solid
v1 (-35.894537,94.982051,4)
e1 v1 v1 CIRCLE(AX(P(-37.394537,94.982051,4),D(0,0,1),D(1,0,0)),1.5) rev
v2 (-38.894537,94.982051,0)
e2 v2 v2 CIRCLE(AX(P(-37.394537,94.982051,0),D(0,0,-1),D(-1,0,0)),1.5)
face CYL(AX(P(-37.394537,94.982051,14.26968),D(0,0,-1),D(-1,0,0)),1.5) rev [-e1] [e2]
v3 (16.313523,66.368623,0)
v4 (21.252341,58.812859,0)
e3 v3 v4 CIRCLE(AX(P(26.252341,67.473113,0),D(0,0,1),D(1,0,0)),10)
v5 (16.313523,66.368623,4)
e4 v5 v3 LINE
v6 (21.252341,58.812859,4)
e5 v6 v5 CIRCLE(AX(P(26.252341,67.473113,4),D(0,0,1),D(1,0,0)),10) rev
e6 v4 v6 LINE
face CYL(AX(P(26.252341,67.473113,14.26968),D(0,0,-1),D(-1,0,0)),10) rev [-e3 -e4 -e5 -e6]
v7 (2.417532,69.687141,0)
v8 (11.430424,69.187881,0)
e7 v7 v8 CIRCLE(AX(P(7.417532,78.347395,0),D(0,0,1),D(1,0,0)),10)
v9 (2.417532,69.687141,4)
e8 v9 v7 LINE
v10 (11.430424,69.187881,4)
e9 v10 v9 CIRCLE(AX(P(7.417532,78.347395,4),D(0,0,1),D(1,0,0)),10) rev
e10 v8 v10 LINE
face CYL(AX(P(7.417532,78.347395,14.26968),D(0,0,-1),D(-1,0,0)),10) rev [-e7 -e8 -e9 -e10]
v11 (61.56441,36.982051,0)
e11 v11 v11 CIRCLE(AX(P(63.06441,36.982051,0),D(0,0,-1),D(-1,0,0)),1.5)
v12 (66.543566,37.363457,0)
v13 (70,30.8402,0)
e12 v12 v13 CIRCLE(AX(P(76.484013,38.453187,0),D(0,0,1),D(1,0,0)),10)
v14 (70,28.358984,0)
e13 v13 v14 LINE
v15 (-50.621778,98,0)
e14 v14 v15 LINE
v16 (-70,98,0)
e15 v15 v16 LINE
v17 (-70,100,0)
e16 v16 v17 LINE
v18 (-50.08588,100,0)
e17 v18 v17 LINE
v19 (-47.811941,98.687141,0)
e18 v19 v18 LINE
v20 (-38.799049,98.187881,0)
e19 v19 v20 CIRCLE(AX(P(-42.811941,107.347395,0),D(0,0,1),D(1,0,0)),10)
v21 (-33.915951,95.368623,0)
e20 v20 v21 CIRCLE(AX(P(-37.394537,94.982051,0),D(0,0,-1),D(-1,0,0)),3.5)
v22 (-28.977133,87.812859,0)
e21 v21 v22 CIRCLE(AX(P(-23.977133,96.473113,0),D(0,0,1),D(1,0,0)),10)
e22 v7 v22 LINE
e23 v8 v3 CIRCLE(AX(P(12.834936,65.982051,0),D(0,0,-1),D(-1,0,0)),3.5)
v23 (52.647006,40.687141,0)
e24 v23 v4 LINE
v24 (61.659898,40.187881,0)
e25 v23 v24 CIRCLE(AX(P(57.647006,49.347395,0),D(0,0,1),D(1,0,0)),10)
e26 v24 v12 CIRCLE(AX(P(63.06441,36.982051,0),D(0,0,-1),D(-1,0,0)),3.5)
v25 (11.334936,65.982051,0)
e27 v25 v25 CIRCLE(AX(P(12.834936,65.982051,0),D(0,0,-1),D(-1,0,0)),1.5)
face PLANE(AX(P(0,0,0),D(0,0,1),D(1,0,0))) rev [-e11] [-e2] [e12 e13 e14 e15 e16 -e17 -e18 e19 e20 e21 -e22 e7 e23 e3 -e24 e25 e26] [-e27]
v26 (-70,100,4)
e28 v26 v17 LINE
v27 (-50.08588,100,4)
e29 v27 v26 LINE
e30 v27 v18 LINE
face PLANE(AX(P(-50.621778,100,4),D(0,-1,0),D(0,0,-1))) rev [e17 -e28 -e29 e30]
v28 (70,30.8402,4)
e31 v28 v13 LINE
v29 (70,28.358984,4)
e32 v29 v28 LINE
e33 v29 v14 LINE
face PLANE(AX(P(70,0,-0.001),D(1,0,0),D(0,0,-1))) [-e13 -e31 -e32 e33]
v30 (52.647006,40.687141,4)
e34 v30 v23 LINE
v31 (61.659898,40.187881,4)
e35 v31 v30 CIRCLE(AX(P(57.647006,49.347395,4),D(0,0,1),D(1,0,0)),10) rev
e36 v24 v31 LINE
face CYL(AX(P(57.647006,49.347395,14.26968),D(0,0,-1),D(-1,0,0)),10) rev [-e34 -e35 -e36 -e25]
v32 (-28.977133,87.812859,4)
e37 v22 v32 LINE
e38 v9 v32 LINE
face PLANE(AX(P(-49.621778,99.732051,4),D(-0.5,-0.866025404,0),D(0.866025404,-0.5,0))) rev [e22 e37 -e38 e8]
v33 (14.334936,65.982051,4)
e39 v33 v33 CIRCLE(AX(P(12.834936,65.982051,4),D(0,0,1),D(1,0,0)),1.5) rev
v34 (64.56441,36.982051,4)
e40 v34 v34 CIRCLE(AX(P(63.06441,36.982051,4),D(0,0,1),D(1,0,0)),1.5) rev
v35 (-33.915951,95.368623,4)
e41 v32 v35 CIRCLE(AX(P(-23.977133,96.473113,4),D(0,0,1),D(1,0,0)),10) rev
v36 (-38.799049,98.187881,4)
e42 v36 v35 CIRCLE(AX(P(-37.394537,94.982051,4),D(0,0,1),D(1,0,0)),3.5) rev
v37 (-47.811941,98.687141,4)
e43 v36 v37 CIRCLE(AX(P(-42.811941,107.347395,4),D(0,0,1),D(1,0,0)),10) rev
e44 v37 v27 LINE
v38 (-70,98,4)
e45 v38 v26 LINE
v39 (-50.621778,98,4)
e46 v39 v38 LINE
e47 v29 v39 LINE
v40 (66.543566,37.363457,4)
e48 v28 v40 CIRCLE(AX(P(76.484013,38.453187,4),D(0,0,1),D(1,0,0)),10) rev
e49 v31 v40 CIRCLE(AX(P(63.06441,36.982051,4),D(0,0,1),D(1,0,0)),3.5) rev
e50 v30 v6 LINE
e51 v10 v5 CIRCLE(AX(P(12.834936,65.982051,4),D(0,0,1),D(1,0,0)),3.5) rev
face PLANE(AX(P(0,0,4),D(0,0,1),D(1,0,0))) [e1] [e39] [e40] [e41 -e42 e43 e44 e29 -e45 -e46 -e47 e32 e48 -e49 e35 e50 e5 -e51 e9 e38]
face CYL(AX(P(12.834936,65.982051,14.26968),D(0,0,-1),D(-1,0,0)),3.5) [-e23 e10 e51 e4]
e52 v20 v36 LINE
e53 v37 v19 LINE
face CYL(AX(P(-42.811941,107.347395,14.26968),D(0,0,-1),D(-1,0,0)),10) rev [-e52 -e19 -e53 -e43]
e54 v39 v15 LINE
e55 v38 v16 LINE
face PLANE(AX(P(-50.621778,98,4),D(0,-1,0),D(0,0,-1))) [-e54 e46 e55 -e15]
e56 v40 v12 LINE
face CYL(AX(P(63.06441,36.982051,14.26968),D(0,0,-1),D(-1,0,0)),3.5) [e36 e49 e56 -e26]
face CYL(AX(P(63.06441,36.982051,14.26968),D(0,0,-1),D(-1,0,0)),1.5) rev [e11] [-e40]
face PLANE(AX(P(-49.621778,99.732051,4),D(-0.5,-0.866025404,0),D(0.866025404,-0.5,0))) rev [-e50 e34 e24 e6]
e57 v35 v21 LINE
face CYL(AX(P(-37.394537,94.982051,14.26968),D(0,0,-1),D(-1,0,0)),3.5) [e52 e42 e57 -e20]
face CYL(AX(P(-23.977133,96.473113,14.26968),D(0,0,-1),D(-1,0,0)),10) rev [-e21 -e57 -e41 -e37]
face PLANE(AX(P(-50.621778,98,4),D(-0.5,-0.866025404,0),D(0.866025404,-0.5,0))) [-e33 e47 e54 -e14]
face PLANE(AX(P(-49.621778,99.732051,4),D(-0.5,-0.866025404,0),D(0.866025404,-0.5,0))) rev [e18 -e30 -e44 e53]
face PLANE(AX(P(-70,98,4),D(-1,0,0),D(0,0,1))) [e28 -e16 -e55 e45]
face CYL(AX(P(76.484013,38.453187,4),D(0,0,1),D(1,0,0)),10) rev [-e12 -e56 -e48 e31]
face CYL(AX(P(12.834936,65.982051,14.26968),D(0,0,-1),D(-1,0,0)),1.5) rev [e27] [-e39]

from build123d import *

# Parameters (mm, degrees)
EXTRUDE_THIN1_DEPTH = 4
SKETCH4_R           = 1.5
BOSS_EXTRUDE1_DEPTH = 4
FILLET1_DEPTH       = 4
CUT_EXTRUDE2_START  = -4
CUT_EXTRUDE2_DEPTH  = 4


with BuildPart() as part:
    # Sketch1 → Extrude-Thin1 (new body)
    with BuildSketch(Plane.XY):
        Polygon((-70, 98), (-50.621778265, 98), (70, 28.358983849), (71, 30.091034656), (-50.08587988, 100), (-70, 100), align=None)
    extrude(amount=EXTRUDE_THIN1_DEPTH)

    # Sketch4 → Boss-Extrude1 (add)
    # profile 1 of 9: a face of its own
    with BuildSketch(Plane(origin=(0, 0, 0), x_dir=(-1, 0, 0), z_dir=(0, 0, -1))):
        with BuildLine():
            ThreePointArc((40.894536929, 94.982050808), (40.775277321, 95.887917465), (40.425625842, 96.732050808))
            ThreePointArc((40.425625842, 96.732050808), (35.644536929, 98.013139721), (34.363448016, 93.232050808))
            ThreePointArc((34.363448016, 93.232050808), (35.026593255, 92.40467952), (35.907068336, 91.813859338))
            Line((35.907068336, 91.813859338), (40.882005522, 94.686140662))
            ThreePointArc((40.882005522, 94.686140662), (40.891402674, 94.833963122), (40.894536929, 94.982050808))
        make_face()
        with Locations((37.394536929, 94.982050808)):
            Circle(SKETCH4_R, mode=Mode.SUBTRACT)
    # profile 2 of 9: a face of its own
    with BuildSketch(Plane(origin=(0, 0, 0), x_dir=(-1, 0, 0), z_dir=(0, 0, -1))):
        with BuildLine():
            Line((41.425625842, 95), (40.425625842, 96.732050808))
            ThreePointArc((40.425625842, 96.732050808), (40.775277321, 95.887917465), (40.894536929, 94.982050808))
            ThreePointArc((40.894536929, 94.982050808), (40.891402674, 94.833963122), (40.882005522, 94.686140662))
            Line((40.882005522, 94.686140662), (41.425625842, 95))
        make_face()
    # profile 3 of 9: a face of its own
    with BuildSketch(Plane(origin=(0, 0, 0), x_dir=(-1, 0, 0), z_dir=(0, 0, -1))):
        with BuildLine():
            ThreePointArc((35.907068336, 91.813859338), (35.026593255, 92.40467952), (34.363448016, 93.232050808))
            Line((34.363448016, 93.232050808), (35.363448016, 91.5))
            Line((35.363448016, 91.5), (35.907068336, 91.813859338))
        make_face()
    # profile 4 of 9: a face of its own
    with BuildSketch(Plane(origin=(0, 0, 0), x_dir=(-1, 0, 0), z_dir=(0, 0, -1))):
        with BuildLine():
            ThreePointArc((-9.334936491, 65.982050808), (-9.454196099, 66.887917465), (-9.803847577, 67.732050808))
            ThreePointArc((-9.803847577, 67.732050808), (-14.584936491, 69.013139721), (-15.866025404, 64.232050808))
            ThreePointArc((-15.866025404, 64.232050808), (-15.202880165, 63.40467952), (-14.322405083, 62.813859338))
            Line((-14.322405083, 62.813859338), (-9.347467898, 65.686140662))
            ThreePointArc((-9.347467898, 65.686140662), (-9.338070746, 65.833963122), (-9.334936491, 65.982050808))
        make_face()
        with Locations((-12.834936491, 65.982050808)):
            Circle(SKETCH4_R, mode=Mode.SUBTRACT)
    # profile 5 of 9: a face of its own
    with BuildSketch(Plane(origin=(0, 0, 0), x_dir=(-1, 0, 0), z_dir=(0, 0, -1))):
        with BuildLine():
            ThreePointArc((-14.322405083, 62.813859338), (-15.202880165, 63.40467952), (-15.866025404, 64.232050808))
            Line((-15.866025404, 64.232050808), (-14.866025404, 62.5))
            Line((-14.866025404, 62.5), (-14.322405083, 62.813859338))
        make_face()
    # profile 6 of 9: a face of its own
    with BuildSketch(Plane(origin=(0, 0, 0), x_dir=(-1, 0, 0), z_dir=(0, 0, -1))):
        with BuildLine():
            Line((-9.347467898, 65.686140662), (-8.803847577, 66))
            Line((-8.803847577, 66), (-9.803847577, 67.732050808))
            ThreePointArc((-9.803847577, 67.732050808), (-9.454196099, 66.887917465), (-9.334936491, 65.982050808))
            ThreePointArc((-9.334936491, 65.982050808), (-9.338070746, 65.833963122), (-9.347467898, 65.686140662))
        make_face()
    # profile 7 of 9: a face of its own
    with BuildSketch(Plane(origin=(0, 0, 0), x_dir=(-1, 0, 0), z_dir=(0, 0, -1))):
        with BuildLine():
            ThreePointArc((-59.56440991, 36.982050808), (-59.683669518, 37.887917465), (-60.033320997, 38.732050808))
            ThreePointArc((-60.033320997, 38.732050808), (-64.81440991, 40.013139721), (-66.095498823, 35.232050808))
            ThreePointArc((-66.095498823, 35.232050808), (-65.432353584, 34.40467952), (-64.551878503, 33.813859338))
            Line((-64.551878503, 33.813859338), (-59.576941317, 36.686140662))
            ThreePointArc((-59.576941317, 36.686140662), (-59.567544165, 36.833963122), (-59.56440991, 36.982050808))
        make_face()
        with Locations((-63.06440991, 36.982050808)):
            Circle(SKETCH4_R, mode=Mode.SUBTRACT)
    # profile 8 of 9: a face of its own
    with BuildSketch(Plane(origin=(0, 0, 0), x_dir=(-1, 0, 0), z_dir=(0, 0, -1))):
        with BuildLine():
            ThreePointArc((-64.551878503, 33.813859338), (-65.432353584, 34.40467952), (-66.095498823, 35.232050808))
            Line((-66.095498823, 35.232050808), (-65.095498823, 33.5))
            Line((-65.095498823, 33.5), (-64.551878503, 33.813859338))
        make_face()
    # profile 9 of 9: a face of its own
    with BuildSketch(Plane(origin=(0, 0, 0), x_dir=(-1, 0, 0), z_dir=(0, 0, -1))):
        with BuildLine():
            Line((-59.576941317, 36.686140662), (-59.033320997, 37))
            Line((-59.033320997, 37), (-60.033320997, 38.732050808))
            ThreePointArc((-60.033320997, 38.732050808), (-59.683669518, 37.887917465), (-59.56440991, 36.982050808))
            ThreePointArc((-59.56440991, 36.982050808), (-59.567544165, 36.833963122), (-59.576941317, 36.686140662))
        make_face()
    extrude(amount=-BOSS_EXTRUDE1_DEPTH)

    # Fillet1: read off the stored shape, not the designer's step
    # Fillet1 outline → Fillet1 (add)
    with BuildSketch(Plane.XY):
        with BuildLine():
            ThreePointArc((60.033320997, 38.732050808), (60.730207809, 39.590019471), (61.659897736, 40.18788074))
            ThreePointArc((61.659897736, 40.18788074), (57.09391383, 39.362702083), (52.647005809, 40.687140793))
            Line((52.647005809, 40.687140793), (59.033320997, 37))
            Line((59.033320997, 37), (60.033320997, 38.732050808))
        make_face()
        with BuildLine():
            ThreePointArc((-40.425625842, 96.732050808), (-39.72873903, 97.590019471), (-38.799049103, 98.18788074))
            ThreePointArc((-38.799049103, 98.18788074), (-43.365033009, 97.362702083), (-47.81194103, 98.687140793))
            Line((-47.81194103, 98.687140793), (-41.425625842, 95))
            Line((-41.425625842, 95), (-40.425625842, 96.732050808))
        make_face()
        with BuildLine():
            Line((-35.363448016, 91.5), (-28.977132828, 87.812859207))
            ThreePointArc((-28.977132828, 87.812859207), (-32.347584407, 91.001775167), (-33.915950681, 95.368622551))
            ThreePointArc((-33.915950681, 95.368622551), (-33.968868764, 94.264556822), (-34.363448016, 93.232050808))
            Line((-34.363448016, 93.232050808), (-35.363448016, 91.5))
        make_face()
        with BuildLine():
            ThreePointArc((9.803847577, 67.732050808), (10.500734389, 68.590019472), (11.430424316, 69.18788074))
            ThreePointArc((11.430424316, 69.18788074), (6.864440411, 68.362702083), (2.41753239, 69.687140793))
            Line((2.41753239, 69.687140793), (8.803847577, 66))
            Line((8.803847577, 66), (9.803847577, 67.732050808))
        make_face()
        with BuildLine():
            Line((14.866025404, 62.5), (21.252340591, 58.812859207))
            ThreePointArc((21.252340591, 58.812859207), (17.881889013, 62.001775167), (16.313522739, 66.368622551))
            ThreePointArc((16.313522739, 66.368622551), (16.260604656, 65.264556823), (15.866025404, 64.232050808))
            Line((15.866025404, 64.232050808), (14.866025404, 62.5))
        make_face()
        with BuildLine():
            ThreePointArc((71, 30.091034656), (67.95755311, 33.22829735), (66.543566366, 37.363456571))
            ThreePointArc((66.543566366, 37.363456571), (66.489544407, 36.262013533), (66.095498823, 35.232050808))
            Line((66.095498823, 35.232050808), (65.095498823, 33.5))
            Line((65.095498823, 33.5), (71, 30.091034656))
        make_face()
    extrude(amount=FILLET1_DEPTH)

    # Sketch5 → Cut-Extrude2 (cut)
    with BuildSketch(Plane.XY.offset(4).offset(CUT_EXTRUDE2_START)):
        with BuildLine():
            Line((71, 30.091034656), (70, 28.358983849))
            Line((70, 28.358983849), (72.530271162, 28.358983849))
            Line((72.530271162, 28.358983849), (72.530271162, 31.310199794))
            Line((72.530271162, 31.310199794), (70, 31.310199794))
            Line((70, 31.310199794), (70, 30.840200363))
            ThreePointArc((70, 30.840200363), (70.488287532, 30.449983494), (71, 30.091034656))
        make_face()
        with BuildLine():
            Line((70, 30.840200363), (70, 28.358983849))
            Line((70, 28.358983849), (71, 30.091034656))
            ThreePointArc((71, 30.091034656), (70.488287532, 30.449983494), (70, 30.840200363))
        make_face()
    extrude(amount=CUT_EXTRUDE2_DEPTH, mode=Mode.SUBTRACT)


solid = part.part
